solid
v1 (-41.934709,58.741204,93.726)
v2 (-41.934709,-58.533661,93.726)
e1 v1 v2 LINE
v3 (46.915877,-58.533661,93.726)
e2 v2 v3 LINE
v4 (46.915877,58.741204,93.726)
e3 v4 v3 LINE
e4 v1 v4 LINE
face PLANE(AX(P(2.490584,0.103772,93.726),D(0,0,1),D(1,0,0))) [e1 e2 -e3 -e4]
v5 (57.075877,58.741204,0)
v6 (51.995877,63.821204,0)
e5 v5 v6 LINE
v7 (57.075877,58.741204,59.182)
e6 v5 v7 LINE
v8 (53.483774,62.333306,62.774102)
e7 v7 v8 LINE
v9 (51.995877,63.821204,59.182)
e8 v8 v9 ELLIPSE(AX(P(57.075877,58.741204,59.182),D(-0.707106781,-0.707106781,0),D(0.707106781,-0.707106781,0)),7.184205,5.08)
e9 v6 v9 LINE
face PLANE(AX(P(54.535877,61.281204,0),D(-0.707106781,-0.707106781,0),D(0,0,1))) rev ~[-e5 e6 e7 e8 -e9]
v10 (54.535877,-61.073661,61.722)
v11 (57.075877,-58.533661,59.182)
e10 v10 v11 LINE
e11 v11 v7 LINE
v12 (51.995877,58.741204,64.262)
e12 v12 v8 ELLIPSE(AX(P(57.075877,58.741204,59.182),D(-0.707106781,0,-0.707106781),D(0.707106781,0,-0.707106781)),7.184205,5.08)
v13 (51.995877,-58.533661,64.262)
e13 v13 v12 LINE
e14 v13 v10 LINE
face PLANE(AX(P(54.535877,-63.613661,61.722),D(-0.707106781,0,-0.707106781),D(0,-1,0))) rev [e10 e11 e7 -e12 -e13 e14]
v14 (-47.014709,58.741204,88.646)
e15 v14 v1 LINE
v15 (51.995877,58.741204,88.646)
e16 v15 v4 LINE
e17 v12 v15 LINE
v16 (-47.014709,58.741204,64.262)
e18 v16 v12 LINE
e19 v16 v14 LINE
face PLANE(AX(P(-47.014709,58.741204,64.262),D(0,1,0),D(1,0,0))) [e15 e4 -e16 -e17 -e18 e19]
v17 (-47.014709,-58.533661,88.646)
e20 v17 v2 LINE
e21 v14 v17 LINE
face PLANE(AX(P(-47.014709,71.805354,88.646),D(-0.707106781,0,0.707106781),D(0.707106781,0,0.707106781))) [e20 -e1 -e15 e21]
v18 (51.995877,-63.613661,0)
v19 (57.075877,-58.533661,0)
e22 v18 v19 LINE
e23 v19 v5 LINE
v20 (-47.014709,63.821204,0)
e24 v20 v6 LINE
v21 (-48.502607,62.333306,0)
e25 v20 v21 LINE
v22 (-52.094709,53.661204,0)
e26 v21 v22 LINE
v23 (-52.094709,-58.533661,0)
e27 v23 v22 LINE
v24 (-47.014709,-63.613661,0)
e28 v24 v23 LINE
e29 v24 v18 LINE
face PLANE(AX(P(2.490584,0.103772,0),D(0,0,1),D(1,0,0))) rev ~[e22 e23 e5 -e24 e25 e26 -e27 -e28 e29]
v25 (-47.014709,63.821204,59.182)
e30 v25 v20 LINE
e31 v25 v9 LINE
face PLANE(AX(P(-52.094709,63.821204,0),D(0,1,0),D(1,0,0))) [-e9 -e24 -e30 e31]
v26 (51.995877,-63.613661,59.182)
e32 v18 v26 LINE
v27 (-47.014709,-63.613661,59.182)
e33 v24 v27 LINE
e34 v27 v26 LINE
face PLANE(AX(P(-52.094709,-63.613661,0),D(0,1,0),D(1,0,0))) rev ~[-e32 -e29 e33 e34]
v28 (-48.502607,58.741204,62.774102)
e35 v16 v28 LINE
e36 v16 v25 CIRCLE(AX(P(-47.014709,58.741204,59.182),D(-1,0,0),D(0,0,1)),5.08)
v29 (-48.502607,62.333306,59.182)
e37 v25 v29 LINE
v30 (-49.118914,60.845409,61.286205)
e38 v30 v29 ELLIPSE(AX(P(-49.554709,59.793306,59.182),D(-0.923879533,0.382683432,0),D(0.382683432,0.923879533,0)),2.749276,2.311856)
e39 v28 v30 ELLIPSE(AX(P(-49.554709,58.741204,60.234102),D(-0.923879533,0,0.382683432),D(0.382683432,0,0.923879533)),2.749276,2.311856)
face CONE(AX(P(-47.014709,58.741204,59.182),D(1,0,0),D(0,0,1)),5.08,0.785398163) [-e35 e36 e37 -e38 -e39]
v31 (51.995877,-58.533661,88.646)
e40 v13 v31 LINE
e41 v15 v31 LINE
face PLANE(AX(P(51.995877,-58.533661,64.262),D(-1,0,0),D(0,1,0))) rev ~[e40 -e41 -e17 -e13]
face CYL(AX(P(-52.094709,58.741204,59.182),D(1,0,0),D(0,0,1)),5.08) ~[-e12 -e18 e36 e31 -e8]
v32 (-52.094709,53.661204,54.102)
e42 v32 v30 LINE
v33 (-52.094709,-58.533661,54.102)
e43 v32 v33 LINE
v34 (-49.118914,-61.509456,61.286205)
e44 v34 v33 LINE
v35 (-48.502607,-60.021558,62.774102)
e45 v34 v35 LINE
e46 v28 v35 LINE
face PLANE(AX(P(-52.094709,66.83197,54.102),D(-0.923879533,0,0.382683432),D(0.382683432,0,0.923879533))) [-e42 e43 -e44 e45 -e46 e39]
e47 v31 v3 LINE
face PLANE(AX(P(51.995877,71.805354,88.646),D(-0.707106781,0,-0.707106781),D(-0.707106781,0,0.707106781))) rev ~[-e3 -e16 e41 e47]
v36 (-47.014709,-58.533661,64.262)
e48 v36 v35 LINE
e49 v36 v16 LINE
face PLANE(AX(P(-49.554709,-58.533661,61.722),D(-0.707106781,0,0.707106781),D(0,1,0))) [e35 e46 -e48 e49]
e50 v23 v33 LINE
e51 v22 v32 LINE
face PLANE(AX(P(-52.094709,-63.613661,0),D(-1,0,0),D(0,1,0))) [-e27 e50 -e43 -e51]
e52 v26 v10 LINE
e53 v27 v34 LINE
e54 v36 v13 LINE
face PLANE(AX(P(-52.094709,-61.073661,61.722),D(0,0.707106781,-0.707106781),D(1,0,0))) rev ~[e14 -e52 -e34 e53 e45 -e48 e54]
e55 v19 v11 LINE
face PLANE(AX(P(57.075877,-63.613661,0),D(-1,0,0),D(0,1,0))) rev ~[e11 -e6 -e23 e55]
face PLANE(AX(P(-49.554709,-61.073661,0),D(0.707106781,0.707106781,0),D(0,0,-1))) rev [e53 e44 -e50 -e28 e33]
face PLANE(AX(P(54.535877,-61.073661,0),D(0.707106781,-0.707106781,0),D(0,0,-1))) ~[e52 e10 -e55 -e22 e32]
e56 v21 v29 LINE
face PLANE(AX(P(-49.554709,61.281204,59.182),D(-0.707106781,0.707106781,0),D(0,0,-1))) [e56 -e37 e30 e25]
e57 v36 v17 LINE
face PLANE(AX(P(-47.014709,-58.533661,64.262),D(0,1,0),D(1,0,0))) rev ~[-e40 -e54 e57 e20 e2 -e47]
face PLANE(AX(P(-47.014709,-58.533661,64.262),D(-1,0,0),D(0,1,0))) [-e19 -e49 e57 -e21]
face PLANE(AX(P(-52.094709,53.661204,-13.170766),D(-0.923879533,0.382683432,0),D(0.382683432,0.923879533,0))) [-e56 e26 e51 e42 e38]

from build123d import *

# Parameters (mm, degrees)
F0_W         = 109.1705858707
F0_H         = 127.4348646402
F1_DEPTH     = 64.262
F2_SIZE      = 5.08
F3_R         = 5.08
F4_SIZE      = 5.08
F5_SIZE      = 5.08
F6_T1_DEPTH  = 85.5235311919
F7_SIZE      = 5.08
F8_SIZE      = 5.08
F9_SIZE      = 5.08
F10_DEPTH    = 29.464
F11_T1_DEPTH = 138.5363958322
F11_T3_DEPTH = 143.403163798


# Not quite as in the source:
# - a fillet or chamfer that OpenCascade refuses, or shapes differently, is made with other operations: its cross-section is extruded or revolved along the edge and cut away or added
# - two fillets or chamfers of one size are made in one step


with BuildPart() as f1:
    # F0 (on Top) → F1 (new body)
    with BuildSketch(Plane.XY):
        with Locations((2.4905838072, 0.1037716866)):
            Rectangle(F0_W, F0_H)
    extrude(amount=F1_DEPTH)

    # F2
    f2_edges = [f1.edges().sort_by_distance(p)[0] for p in [
        (57.075877, 0.103772, 64.262),
    ]]
    chamfer(f2_edges, length=F2_SIZE)

    # F3
    f3_edges = [f1.edges().sort_by_distance(p)[0] for p in [
        (-0.049416, 63.821204, 64.262),
    ]]
    fillet(f3_edges, radius=F3_R)

    # F4
    f4_edges = [f1.edges().sort_by_distance(p)[0] for p in [
        (-0.049416, -63.613661, 64.262),
    ]]
    chamfer(f4_edges, length=F4_SIZE)

    # F5
    f5_edges = [f1.edges().sort_by_distance(p)[0] for p in [
        (-52.094709, 0.103772, 64.262),
    ]]
    chamfer(f5_edges, length=F5_SIZE)

    # F6: chamfer of 5.08 on 1 edges, made by hand

    # F6_s2 → F6_t1 (cut)
    with BuildSketch(Plane.XY.offset(-13.170765596)):
        Polygon((-52.0947091281, 53.6612040067), (-48.5026066797, 62.3333064551), (-52.0947091281, 58.7412040067), align=None)
    extrude(amount=F6_T1_DEPTH, mode=Mode.SUBTRACT)

    # F7
    f7_edges = [f1.edges().sort_by_distance(p)[0] for p in [
        (-52.094709, -63.613661, 29.591),
    ]]
    chamfer(f7_edges, length=F7_SIZE)

    # F8
    f8_edges = [f1.edges().sort_by_distance(p)[0] for p in [
        (57.075877, -63.613661, 29.591),
    ]]
    chamfer(f8_edges, length=F8_SIZE)

    # F9
    f9_edges = [f1.edges().sort_by_distance(p)[0] for p in [
        (57.075877, 63.821204, 29.591),
    ]]
    chamfer(f9_edges, length=F9_SIZE)

    # F10 (add): a face of the model
    f10_faces = [f1.faces().sort_by_distance(p)[0] for p in [
        (2.4905838072, 0.1037716866, 64.262),
    ]]
    extrude(f10_faces, amount=F10_DEPTH)

    # F11: chamfer of 5.08 on 3 edges, made by hand

    # F11_s2 → F11_t1 (cut)
    with BuildSketch(Plane.XZ.offset(-66.8319696027)):
        Polygon((-52.0947091281, 54.102), (-48.5026066797, 62.7741024484), (-52.0947091281, 59.182), align=None)
    extrude(amount=F11_T1_DEPTH, mode=Mode.SUBTRACT)

    # F11_s4 → F11_t3 (cut)
    with BuildSketch(Plane.XZ.offset(-71.8053535855)):
        Polygon((51.9958767426, 88.646), (46.9158767426, 93.726), (51.9958767426, 93.726), align=None)
        Polygon((-47.0147091281, 88.646), (-41.9347091281, 93.726), (-47.0147091281, 93.726), align=None)
    extrude(amount=F11_T3_DEPTH, mode=Mode.SUBTRACT)


solid = f1.part
